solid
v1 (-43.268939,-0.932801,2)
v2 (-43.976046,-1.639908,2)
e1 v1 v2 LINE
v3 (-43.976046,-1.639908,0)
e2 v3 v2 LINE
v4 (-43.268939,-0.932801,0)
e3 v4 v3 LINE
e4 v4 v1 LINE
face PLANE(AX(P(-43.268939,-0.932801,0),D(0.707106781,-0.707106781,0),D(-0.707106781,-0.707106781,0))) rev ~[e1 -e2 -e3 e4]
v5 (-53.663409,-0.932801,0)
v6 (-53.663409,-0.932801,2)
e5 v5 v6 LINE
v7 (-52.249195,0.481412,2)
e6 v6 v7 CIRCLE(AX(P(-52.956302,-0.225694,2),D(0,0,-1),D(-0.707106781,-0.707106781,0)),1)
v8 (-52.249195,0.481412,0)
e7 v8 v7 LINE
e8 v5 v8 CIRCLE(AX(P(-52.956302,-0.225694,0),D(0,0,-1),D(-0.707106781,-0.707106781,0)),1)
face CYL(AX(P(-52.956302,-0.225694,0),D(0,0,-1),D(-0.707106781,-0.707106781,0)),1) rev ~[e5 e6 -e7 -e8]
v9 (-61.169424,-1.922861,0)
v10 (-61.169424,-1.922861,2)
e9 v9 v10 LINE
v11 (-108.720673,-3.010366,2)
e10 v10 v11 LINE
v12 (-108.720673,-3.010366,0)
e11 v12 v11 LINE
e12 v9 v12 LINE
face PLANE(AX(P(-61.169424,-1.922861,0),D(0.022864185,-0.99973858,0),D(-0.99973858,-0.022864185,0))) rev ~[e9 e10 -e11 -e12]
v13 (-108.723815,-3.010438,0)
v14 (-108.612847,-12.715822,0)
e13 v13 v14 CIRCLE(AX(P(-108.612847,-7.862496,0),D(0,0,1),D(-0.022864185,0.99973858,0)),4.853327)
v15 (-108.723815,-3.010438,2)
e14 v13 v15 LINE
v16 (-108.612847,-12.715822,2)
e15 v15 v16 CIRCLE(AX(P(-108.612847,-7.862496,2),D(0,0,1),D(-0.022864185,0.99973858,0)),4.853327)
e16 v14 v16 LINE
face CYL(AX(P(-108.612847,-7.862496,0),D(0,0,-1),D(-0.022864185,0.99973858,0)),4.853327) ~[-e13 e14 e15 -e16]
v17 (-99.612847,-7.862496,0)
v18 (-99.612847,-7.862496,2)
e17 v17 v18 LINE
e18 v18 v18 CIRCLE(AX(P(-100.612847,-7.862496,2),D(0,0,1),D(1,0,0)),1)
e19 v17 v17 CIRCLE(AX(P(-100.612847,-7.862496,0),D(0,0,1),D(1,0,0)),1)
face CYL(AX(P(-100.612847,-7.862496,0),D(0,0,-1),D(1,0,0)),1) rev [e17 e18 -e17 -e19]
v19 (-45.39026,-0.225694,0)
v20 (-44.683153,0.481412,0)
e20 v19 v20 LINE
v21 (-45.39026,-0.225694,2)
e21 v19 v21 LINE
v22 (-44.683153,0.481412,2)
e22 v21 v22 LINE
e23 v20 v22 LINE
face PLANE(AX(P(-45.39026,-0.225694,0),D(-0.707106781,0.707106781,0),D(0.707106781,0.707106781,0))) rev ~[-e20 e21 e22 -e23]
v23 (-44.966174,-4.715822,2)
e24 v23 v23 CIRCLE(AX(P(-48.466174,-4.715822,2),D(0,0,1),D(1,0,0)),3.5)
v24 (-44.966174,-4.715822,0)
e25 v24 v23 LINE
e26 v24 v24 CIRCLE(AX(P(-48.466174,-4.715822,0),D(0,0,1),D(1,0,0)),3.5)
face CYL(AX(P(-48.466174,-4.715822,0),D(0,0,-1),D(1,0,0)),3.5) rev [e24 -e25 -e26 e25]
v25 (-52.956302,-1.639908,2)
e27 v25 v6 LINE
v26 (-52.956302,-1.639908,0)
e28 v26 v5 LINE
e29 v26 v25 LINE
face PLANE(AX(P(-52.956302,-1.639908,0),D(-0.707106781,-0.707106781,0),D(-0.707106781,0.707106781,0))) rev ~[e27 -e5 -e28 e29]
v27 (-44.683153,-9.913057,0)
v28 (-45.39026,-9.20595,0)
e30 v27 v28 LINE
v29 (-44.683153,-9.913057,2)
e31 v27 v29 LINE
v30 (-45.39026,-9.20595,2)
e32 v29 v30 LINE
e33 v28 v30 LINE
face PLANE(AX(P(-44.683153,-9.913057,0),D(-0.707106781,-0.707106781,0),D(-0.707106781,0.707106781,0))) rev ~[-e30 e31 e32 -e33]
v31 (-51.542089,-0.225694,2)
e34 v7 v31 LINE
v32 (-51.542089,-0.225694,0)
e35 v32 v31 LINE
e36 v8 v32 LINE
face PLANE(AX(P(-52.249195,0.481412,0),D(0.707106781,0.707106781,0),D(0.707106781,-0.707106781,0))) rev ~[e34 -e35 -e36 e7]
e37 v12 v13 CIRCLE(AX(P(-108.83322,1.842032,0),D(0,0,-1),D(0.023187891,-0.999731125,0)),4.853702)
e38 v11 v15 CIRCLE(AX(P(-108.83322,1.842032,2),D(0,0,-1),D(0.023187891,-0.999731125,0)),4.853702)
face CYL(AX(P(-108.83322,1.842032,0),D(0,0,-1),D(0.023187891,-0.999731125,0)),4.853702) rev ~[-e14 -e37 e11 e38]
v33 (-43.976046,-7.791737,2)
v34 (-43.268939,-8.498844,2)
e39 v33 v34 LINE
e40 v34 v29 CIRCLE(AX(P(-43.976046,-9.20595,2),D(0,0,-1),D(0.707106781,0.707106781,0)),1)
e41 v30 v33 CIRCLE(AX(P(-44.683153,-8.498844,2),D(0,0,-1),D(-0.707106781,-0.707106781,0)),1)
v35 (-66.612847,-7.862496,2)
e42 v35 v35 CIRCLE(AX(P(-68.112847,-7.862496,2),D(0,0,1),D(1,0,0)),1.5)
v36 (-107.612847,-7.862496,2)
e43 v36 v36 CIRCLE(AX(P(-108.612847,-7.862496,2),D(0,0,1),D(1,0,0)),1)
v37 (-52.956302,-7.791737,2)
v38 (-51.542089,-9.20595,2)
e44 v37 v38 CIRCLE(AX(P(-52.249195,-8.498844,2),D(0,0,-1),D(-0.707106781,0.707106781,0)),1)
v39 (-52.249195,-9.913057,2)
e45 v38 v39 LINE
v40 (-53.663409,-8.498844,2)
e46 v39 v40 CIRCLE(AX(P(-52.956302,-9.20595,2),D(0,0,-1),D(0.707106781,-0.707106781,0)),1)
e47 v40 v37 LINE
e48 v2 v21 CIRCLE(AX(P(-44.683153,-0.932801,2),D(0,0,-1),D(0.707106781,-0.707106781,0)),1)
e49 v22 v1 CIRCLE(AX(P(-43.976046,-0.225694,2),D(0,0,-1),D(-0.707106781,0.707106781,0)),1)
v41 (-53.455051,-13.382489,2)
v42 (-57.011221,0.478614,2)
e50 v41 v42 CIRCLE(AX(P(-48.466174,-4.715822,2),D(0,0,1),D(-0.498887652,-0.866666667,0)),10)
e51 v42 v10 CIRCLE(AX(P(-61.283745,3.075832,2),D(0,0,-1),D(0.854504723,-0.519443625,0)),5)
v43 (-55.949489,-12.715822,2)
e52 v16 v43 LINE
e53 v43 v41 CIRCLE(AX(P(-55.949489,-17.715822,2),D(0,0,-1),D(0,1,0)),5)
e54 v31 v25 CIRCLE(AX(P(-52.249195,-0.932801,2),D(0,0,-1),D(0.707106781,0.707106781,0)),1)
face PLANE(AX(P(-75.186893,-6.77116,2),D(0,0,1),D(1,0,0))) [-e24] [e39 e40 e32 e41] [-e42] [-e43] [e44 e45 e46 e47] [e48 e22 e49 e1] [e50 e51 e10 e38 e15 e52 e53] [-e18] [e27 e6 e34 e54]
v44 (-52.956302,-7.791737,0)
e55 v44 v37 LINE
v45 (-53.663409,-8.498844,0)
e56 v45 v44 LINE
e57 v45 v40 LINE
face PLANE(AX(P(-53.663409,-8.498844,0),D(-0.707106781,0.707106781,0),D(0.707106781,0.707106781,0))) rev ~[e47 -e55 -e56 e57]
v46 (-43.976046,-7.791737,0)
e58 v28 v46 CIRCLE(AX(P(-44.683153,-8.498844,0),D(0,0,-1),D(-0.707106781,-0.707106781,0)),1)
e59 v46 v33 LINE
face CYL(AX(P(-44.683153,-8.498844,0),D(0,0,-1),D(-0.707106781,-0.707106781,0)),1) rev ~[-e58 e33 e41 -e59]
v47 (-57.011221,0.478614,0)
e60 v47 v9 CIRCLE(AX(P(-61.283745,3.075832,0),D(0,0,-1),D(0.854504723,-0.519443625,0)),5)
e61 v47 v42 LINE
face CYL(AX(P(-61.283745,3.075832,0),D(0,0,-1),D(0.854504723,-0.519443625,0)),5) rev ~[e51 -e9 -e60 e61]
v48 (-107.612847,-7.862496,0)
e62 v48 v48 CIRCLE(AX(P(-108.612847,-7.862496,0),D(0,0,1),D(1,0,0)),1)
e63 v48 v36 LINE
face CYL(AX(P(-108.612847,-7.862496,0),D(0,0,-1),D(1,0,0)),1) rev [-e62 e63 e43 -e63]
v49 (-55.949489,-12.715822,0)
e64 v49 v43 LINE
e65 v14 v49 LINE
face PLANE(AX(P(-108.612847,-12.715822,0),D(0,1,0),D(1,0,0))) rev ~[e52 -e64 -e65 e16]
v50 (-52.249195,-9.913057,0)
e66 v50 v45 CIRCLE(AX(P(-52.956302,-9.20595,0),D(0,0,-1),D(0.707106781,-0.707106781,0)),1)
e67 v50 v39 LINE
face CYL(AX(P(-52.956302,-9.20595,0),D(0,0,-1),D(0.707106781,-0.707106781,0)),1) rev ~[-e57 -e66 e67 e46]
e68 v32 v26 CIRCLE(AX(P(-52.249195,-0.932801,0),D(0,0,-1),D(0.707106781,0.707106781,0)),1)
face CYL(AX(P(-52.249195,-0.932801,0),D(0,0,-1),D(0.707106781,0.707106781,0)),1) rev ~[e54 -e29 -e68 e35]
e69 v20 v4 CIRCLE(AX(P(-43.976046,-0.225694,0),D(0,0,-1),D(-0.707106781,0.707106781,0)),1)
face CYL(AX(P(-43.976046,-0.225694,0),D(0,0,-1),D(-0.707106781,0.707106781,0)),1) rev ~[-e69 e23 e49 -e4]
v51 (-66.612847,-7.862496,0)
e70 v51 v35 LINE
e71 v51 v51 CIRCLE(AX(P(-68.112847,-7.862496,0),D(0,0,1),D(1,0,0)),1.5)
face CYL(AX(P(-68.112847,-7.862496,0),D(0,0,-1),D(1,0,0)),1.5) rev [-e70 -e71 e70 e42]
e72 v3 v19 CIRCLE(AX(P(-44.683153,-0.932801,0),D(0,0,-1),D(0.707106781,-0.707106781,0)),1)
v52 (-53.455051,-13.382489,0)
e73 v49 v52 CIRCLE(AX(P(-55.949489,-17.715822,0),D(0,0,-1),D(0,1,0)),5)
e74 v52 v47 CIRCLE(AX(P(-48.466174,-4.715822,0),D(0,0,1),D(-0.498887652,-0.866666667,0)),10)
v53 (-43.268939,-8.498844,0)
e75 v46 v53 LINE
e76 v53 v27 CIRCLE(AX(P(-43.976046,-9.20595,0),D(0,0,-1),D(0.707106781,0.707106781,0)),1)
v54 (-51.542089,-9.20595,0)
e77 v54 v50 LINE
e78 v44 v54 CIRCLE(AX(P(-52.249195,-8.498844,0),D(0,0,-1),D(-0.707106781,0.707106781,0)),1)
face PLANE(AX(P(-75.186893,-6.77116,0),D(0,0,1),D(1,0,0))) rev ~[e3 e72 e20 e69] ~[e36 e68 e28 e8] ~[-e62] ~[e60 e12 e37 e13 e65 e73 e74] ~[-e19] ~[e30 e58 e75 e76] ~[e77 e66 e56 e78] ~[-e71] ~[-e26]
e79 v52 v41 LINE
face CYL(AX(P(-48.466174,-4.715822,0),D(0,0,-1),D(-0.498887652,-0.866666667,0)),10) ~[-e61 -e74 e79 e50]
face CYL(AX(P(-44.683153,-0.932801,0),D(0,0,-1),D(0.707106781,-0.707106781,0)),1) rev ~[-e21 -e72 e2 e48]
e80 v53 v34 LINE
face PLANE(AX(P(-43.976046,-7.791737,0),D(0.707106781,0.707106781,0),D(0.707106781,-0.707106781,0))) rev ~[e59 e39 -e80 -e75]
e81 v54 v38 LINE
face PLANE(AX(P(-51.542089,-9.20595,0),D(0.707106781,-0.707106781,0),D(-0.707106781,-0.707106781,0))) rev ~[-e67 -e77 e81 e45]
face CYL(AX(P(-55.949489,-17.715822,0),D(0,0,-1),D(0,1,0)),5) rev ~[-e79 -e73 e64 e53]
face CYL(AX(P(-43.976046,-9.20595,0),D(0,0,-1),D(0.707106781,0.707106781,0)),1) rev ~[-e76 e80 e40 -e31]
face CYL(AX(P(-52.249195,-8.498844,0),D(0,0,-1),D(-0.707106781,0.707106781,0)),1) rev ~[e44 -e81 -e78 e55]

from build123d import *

# Parameters (mm, degrees)
F0_R     = 1
F0_R_2   = 1.5
F0_R_3   = 3.5
F1_DEPTH = 2


# Not quite as in the source:
# - ends of sketch curves that miss each other by under 0.0002 mm in the source are joined


with BuildPart() as f1:
    # F0 (on Top) → F1 (new body)
    with BuildSketch(Plane.XY):
        with BuildLine():
            ThreePointArc((-55.949488929, -12.7158224136), (-54.6584944803, -12.8853634982), (-53.4550506712, -13.3824890802))
            ThreePointArc((-53.4550506712, -13.3824890802), (-38.7798788654, -2.230730151), (-57.0112213811, 0.4786138322))
            ThreePointArc((-57.0112213811, 0.4786138322), (-58.7831707533, -1.2539634751), (-61.1694240668, -1.9228609466))
            Line((-61.1694240668, -1.9228609466), (-108.7206725135, -3.0103658035))
            ThreePointArc((-108.7206725135, -3.0103658035), (-108.7222436347, -3.0104019898), (-108.7238147676, -3.0104376674))
            ThreePointArc((-108.7238147676, -3.0104376674), (-113.4658569564, -7.9179829708), (-108.6128474049, -12.7158224136))
            Line((-108.6128474049, -12.7158224136), (-55.949488929, -12.7158224136))
        make_face()
        with Locations((-108.6128474049, -7.862495663)):
            Circle(F0_R, mode=Mode.SUBTRACT)
        with Locations((-100.6128474049, -7.862495663)):
            Circle(F0_R, mode=Mode.SUBTRACT)
        with Locations((-68.1128474049, -7.862495663)):
            Circle(F0_R_2, mode=Mode.SUBTRACT)
        with BuildLine():
            ThreePointArc((-52.2491954348, -9.9130572553), (-53.6634089972, -9.9130572553), (-53.6634089972, -8.4988436929))
            Line((-53.6634089972, -8.4988436929), (-52.956302216, -7.7917369117))
            ThreePointArc((-52.956302216, -7.7917369117), (-51.5420886536, -7.7917369117), (-51.5420886536, -9.2059504741))
            Line((-51.5420886536, -9.2059504741), (-52.2491954348, -9.9130572553))
        make_face(mode=Mode.SUBTRACT)
        with BuildLine():
            ThreePointArc((-43.2689393138, -8.4988436929), (-43.2689393138, -9.9130572553), (-44.6831528761, -9.9130572553))
            Line((-44.6831528761, -9.9130572553), (-45.3902596573, -9.2059504741))
            ThreePointArc((-45.3902596573, -9.2059504741), (-45.3902596573, -7.7917369117), (-43.9760460949, -7.7917369117))
            Line((-43.9760460949, -7.7917369117), (-43.2689393138, -8.4988436929))
        make_face(mode=Mode.SUBTRACT)
        with Locations((-48.4661741555, -4.7158224136)):
            Circle(F0_R_3, mode=Mode.SUBTRACT)
        with BuildLine():
            ThreePointArc((-53.6634089972, -0.9328011342), (-53.6634089972, 0.4814124282), (-52.2491954348, 0.4814124282))
            Line((-52.2491954348, 0.4814124282), (-51.5420886536, -0.225694353))
            ThreePointArc((-51.5420886536, -0.225694353), (-51.5420886536, -1.6399079154), (-52.956302216, -1.6399079154))
            Line((-52.956302216, -1.6399079154), (-53.6634089972, -0.9328011342))
        make_face(mode=Mode.SUBTRACT)
        with BuildLine():
            ThreePointArc((-43.9760460949, -1.6399079154), (-45.3902596573, -1.6399079154), (-45.3902596573, -0.225694353))
            Line((-45.3902596573, -0.225694353), (-44.6831528761, 0.4814124282))
            ThreePointArc((-44.6831528761, 0.4814124282), (-43.2689393138, 0.4814124282), (-43.2689393138, -0.9328011342))
            Line((-43.2689393138, -0.9328011342), (-43.9760460949, -1.6399079154))
        make_face(mode=Mode.SUBTRACT)
    extrude(amount=F1_DEPTH)


solid = f1.part
